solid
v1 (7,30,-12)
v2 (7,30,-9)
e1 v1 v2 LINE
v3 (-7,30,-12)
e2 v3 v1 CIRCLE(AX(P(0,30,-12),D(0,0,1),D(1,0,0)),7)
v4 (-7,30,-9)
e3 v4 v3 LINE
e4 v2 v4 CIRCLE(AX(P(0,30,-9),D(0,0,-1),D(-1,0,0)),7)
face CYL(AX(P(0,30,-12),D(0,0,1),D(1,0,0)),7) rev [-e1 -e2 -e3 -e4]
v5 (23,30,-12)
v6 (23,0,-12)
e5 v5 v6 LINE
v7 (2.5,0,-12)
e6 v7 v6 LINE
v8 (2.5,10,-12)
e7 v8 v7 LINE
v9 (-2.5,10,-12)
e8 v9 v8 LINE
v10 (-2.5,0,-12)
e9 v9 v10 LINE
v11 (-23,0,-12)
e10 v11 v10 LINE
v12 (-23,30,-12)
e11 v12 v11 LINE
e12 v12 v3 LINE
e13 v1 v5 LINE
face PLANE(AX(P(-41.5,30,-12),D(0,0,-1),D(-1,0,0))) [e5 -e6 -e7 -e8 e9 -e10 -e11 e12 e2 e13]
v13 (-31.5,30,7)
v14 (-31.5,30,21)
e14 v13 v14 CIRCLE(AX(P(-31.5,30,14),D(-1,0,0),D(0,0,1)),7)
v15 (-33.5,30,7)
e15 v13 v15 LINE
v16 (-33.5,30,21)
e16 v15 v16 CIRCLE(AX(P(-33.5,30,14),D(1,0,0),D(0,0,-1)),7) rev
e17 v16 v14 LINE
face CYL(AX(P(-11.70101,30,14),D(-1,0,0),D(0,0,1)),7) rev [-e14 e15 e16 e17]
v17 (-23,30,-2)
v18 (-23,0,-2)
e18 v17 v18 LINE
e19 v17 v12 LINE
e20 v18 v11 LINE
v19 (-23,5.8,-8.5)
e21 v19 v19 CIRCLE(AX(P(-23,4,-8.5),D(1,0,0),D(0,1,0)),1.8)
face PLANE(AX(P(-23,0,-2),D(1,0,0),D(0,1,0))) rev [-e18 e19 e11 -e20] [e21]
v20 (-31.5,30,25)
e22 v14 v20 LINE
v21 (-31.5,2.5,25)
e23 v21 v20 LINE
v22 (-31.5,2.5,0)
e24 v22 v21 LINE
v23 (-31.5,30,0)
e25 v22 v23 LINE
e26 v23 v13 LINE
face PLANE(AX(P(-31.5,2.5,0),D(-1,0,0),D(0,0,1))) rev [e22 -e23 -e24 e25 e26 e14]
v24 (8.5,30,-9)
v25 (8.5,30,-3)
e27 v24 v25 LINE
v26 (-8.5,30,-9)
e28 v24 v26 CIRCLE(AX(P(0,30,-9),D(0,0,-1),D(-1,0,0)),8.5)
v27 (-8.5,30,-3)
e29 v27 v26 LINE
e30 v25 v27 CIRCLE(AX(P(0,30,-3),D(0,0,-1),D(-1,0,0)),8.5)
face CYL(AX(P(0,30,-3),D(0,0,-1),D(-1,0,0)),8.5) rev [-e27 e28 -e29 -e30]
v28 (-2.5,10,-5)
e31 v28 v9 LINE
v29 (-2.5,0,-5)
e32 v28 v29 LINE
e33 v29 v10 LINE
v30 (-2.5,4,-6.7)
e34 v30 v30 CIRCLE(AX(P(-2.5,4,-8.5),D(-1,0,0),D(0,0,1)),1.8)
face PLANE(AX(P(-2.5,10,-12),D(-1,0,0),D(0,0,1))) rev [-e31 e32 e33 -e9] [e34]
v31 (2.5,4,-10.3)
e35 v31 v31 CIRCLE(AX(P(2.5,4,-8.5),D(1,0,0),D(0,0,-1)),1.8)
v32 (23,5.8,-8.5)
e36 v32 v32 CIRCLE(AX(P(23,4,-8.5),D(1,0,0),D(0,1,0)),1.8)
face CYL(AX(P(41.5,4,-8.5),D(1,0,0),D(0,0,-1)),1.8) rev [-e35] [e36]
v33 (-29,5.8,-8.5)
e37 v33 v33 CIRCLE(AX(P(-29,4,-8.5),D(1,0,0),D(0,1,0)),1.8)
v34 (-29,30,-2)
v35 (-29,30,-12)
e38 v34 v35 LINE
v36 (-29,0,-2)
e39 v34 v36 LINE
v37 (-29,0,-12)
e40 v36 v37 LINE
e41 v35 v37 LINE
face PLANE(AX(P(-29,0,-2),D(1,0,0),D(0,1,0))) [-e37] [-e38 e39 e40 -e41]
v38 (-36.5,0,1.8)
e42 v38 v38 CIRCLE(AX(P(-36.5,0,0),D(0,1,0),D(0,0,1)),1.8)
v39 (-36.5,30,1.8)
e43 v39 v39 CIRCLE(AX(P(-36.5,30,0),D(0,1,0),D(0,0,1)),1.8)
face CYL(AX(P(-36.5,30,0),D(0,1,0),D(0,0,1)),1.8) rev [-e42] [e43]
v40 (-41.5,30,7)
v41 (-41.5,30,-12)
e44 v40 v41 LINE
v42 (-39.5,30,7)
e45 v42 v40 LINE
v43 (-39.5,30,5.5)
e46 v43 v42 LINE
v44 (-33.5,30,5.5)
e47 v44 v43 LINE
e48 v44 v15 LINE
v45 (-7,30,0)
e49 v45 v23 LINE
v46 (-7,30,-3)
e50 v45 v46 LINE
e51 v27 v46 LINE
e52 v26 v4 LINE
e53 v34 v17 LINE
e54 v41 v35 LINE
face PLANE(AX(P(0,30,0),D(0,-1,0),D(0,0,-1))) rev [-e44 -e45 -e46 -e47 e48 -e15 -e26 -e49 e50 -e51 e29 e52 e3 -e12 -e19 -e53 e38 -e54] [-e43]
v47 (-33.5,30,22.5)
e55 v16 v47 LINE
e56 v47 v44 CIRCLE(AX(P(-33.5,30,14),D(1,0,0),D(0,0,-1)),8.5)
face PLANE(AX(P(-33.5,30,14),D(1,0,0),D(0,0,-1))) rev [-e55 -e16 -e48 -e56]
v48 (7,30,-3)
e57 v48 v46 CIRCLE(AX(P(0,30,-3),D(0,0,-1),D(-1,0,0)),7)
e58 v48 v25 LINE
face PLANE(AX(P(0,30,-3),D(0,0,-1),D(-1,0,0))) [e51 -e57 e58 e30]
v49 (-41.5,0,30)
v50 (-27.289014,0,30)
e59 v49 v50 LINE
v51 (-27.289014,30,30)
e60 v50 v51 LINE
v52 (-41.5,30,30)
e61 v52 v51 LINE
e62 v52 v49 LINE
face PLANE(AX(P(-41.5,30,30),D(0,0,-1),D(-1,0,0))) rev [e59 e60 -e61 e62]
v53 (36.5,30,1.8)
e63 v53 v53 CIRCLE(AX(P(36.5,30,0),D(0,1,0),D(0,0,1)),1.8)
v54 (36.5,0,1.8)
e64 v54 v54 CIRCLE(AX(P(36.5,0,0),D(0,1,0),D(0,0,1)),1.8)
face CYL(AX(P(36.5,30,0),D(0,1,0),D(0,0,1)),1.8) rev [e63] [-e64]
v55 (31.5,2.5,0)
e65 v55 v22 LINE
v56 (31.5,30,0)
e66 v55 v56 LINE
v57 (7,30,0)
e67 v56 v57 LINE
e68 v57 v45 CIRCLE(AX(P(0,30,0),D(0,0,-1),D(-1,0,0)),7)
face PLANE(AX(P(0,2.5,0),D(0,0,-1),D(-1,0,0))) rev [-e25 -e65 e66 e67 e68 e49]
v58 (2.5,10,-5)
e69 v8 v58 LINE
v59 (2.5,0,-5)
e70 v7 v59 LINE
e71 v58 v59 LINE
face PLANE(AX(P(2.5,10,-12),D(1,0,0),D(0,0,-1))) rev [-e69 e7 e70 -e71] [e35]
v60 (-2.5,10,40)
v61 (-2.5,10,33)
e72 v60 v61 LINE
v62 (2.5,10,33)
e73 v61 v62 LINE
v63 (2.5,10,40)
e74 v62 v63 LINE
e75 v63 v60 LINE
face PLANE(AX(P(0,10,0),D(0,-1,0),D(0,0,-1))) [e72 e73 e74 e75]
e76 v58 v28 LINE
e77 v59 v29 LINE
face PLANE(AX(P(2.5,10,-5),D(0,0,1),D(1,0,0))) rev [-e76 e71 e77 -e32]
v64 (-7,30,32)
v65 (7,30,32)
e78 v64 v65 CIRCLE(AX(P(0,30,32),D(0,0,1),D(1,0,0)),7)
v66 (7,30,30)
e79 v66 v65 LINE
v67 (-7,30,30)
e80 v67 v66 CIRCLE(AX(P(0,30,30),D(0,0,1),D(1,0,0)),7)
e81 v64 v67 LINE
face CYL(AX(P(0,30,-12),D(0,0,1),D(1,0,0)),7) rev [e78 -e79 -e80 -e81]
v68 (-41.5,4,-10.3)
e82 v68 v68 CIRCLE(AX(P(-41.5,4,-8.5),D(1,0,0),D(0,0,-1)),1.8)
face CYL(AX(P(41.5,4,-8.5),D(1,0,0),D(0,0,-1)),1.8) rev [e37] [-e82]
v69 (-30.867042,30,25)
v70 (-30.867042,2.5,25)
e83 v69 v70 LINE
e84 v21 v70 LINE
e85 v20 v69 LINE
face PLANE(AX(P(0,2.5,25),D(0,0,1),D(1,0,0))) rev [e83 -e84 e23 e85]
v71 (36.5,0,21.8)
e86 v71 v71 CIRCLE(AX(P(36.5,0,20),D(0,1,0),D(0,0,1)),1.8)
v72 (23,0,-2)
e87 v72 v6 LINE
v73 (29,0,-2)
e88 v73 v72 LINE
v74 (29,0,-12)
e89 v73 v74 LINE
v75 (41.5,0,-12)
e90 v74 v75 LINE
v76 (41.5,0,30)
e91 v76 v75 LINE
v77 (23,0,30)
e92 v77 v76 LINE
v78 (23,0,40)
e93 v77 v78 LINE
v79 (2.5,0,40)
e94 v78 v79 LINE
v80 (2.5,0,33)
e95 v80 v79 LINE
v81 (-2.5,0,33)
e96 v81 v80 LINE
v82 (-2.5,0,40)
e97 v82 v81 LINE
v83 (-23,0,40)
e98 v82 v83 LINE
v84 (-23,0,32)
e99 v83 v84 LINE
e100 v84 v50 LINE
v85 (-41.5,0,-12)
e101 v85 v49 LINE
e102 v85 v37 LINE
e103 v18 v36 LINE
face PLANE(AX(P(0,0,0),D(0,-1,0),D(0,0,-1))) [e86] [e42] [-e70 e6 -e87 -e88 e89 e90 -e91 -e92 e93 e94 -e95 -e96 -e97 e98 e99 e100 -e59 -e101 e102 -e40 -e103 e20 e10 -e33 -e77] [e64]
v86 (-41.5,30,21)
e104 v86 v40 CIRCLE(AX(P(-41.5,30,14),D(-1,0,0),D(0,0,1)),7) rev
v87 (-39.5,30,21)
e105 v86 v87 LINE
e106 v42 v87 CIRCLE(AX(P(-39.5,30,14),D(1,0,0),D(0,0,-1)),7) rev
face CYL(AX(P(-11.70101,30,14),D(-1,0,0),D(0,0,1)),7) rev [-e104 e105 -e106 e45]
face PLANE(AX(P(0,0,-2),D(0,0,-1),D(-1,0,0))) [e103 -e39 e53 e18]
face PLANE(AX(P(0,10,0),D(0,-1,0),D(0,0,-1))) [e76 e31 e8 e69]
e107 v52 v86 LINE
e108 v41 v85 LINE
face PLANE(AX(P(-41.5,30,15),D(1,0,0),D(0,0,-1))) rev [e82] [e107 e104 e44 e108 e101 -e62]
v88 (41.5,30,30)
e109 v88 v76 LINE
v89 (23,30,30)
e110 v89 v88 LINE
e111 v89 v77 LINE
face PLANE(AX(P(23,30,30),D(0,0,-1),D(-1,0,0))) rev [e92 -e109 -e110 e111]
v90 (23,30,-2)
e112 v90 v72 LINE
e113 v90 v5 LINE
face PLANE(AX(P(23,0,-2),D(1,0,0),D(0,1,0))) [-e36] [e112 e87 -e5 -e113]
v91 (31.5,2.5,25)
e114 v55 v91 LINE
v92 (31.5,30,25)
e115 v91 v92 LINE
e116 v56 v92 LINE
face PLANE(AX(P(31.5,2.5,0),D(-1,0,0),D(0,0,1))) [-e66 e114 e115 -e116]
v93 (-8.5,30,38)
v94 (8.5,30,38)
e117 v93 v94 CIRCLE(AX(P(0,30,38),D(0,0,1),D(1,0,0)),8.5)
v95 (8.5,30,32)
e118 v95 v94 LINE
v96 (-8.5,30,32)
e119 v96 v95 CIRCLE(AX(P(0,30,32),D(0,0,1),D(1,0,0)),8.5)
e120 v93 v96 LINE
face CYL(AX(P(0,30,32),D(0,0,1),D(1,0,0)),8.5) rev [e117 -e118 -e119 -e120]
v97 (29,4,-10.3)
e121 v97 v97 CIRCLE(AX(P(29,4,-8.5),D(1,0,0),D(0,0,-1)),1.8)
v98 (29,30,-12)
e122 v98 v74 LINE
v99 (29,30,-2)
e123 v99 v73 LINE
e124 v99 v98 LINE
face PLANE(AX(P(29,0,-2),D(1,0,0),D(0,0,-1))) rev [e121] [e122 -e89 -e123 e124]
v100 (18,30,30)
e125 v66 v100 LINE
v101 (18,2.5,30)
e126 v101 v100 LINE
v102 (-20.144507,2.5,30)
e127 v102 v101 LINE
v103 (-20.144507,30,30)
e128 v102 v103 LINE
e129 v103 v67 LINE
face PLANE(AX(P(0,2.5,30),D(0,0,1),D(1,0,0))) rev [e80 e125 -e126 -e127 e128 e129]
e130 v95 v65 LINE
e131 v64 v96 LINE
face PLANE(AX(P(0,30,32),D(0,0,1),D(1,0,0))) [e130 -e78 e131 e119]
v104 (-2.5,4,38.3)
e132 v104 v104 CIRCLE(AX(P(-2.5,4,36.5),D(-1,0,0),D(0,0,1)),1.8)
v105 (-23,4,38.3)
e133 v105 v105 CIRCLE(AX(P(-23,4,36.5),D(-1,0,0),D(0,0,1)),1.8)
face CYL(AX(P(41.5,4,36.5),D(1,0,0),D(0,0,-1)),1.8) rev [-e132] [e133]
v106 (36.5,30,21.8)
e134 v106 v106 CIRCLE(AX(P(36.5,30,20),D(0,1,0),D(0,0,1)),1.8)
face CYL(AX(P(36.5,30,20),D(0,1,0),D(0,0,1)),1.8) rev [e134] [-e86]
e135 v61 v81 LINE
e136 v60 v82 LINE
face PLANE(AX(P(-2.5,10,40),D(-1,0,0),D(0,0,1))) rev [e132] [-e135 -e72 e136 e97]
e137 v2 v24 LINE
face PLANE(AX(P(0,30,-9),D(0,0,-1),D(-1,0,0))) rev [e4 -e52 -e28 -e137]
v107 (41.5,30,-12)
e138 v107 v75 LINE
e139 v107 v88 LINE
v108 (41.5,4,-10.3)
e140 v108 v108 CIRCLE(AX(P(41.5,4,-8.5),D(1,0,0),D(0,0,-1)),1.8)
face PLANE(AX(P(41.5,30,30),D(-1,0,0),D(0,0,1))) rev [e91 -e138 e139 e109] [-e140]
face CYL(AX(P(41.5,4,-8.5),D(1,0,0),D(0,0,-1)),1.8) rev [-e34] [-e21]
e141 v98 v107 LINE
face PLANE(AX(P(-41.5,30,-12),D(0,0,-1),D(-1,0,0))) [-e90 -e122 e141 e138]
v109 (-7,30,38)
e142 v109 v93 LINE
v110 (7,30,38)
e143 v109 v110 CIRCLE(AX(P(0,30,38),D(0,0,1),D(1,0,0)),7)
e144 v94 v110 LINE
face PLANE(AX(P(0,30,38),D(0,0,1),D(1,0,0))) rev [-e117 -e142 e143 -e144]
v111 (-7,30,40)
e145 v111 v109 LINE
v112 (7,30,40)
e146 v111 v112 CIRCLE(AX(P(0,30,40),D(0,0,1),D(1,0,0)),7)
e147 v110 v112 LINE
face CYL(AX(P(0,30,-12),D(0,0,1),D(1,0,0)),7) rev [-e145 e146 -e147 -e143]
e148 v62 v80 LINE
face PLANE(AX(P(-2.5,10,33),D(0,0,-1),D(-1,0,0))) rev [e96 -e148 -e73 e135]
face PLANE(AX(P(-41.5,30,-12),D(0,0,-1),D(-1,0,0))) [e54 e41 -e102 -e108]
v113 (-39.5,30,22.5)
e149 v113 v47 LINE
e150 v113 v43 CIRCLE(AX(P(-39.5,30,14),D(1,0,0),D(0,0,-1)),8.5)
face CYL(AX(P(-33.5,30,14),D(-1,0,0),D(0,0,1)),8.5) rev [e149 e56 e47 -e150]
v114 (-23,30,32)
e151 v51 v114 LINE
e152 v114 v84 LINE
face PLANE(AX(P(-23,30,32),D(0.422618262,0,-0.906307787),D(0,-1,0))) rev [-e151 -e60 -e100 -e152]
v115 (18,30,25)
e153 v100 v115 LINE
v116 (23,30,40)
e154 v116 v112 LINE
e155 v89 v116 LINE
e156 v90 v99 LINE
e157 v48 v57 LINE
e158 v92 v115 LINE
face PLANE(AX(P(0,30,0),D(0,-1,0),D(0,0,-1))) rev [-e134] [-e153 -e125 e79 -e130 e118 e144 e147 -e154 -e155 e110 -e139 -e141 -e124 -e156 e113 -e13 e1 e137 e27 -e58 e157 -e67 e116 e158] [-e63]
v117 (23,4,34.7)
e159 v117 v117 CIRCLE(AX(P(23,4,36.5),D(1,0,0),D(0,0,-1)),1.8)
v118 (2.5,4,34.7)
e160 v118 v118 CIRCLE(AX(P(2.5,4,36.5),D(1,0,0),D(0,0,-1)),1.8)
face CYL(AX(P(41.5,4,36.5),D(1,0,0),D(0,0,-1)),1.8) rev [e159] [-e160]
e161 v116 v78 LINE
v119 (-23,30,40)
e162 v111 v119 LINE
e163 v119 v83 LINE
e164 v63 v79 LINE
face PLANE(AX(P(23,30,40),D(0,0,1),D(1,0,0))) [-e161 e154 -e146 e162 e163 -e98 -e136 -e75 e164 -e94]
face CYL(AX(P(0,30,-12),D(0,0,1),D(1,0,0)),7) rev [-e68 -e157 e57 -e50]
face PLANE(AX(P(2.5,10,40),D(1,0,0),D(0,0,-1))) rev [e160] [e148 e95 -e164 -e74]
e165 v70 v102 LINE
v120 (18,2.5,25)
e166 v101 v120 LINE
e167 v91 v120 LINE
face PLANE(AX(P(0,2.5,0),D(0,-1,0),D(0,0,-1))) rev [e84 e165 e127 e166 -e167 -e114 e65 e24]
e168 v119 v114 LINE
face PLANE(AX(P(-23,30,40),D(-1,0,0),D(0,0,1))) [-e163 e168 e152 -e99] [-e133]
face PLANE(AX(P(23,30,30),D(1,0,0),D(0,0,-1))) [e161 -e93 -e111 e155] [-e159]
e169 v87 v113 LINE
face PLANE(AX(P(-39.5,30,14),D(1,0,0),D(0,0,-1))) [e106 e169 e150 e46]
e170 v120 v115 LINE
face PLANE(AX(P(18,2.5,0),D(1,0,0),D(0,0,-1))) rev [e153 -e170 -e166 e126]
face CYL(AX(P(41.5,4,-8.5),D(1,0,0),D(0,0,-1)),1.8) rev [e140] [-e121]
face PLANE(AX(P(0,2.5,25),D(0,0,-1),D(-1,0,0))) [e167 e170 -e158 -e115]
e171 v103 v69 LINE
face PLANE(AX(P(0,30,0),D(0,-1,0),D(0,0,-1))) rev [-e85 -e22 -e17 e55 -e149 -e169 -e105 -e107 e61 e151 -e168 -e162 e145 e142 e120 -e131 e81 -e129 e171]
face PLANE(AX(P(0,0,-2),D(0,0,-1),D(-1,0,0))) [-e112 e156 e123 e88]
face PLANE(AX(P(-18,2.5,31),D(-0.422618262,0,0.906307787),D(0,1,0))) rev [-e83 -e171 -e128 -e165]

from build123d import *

# Parameters (mm, degrees)
BOSS_EXTRUDE1_DEPTH  = 30
CUT_EXTRUDE2_START   = 2.5
CUT_EXTRUDE2_DEPTH   = 27.5
CUT_EXTRUDE3_START   = -2
SKETCH3_R            = 8.5
CUT_EXTRUDE3_DEPTH   = 6
CUT_EXTRUDE4_START   = -9
SKETCH4_R            = 8.5
CUT_EXTRUDE4_DEPTH   = 6
CUT_EXTRUDE6_DEPTH   = 73.981161953
SKETCH16_W           = 6
SKETCH16_H           = 30
CUT_EXTRUDE7_DEPTH   = 10
CUT_EXTRUDE8_START   = 2
SKETCH17_R           = 8.5
CUT_EXTRUDE8_DEPTH   = 6
CUT_EXTRUDE9_REACH   = 98.897
CHAMFER1_SIZE        = 2
CHAMFER1_SIZE2       = 4.289013841
CHAMFER2_SIZE        = 12.867041523
CHAMFER2_SIZE_2      = 6
SKETCH19_W           = 5
SKETCH19_H           = 7
CUT_EXTRUDE11_DEPTH  = 10
M3_CLEARANCE_HOLE1_D = 3.6
M3_CLEARANCE_HOLE2_D = 3.6


with BuildPart() as part:
    # Sketch1 → Boss-Extrude1 (new body)
    with BuildSketch(Plane(origin=(0, 0, 0), x_dir=(1, 0, 0), z_dir=(0, 1, 0))):
        Polygon((-41.5, 12), (41.5, 12), (41.5, -15), (41.5, -30), (23, -30), (23, -40), (-23, -40), (-23, -30), (-41.5, -30), (-41.5, -15), align=None)
    extrude(amount=BOSS_EXTRUDE1_DEPTH)

    # Sketch1<4> → Cut-Extrude2 (cut)
    with BuildSketch(Plane(origin=(0, 0, 0), x_dir=(1, 0, 0), z_dir=(0, 1, 0)).offset(CUT_EXTRUDE2_START)):
        Polygon((31.5, 0), (-31.5, 0), (-31.5, -10), (-31.5, -25), (-18, -25), (-18, -30), (18, -30), (18, -25), (31.5, -25), (31.5, -10), align=None)
    extrude(amount=CUT_EXTRUDE2_DEPTH, mode=Mode.SUBTRACT)

    # Sketch3 → Cut-Extrude3 (cut)
    with BuildSketch(Plane.XY.offset(40).offset(CUT_EXTRUDE3_START)):
        with Locations((0, 30)):
            Circle(SKETCH3_R)
    extrude(amount=-CUT_EXTRUDE3_DEPTH, mode=Mode.SUBTRACT)

    # Sketch4 → Cut-Extrude4 (cut)
    with BuildSketch(Plane(origin=(0, 0, -12), x_dir=(-1, 0, 0), z_dir=(0, 0, -1)).offset(CUT_EXTRUDE4_START)):
        with Locations((0, 30)):
            Circle(SKETCH4_R)
    extrude(amount=CUT_EXTRUDE4_DEPTH, mode=Mode.SUBTRACT)

    # Sketch3<4> → Cut-Extrude6 (cut, through all)
    with BuildSketch(Plane.XY.offset(40)):
        with BuildLine():
            Line((-7, 30), (7, 30))
            ThreePointArc((7, 30), (0, 37), (-7, 30))
        make_face()
        with BuildLine():
            ThreePointArc((-7, 30), (0, 23), (7, 30))
            Line((7, 30), (-7, 30))
        make_face()
        with BuildLine():
            Line((-7, 30), (7, 30))
            ThreePointArc((7, 30), (0, 37), (-7, 30))
        make_face()
        with BuildLine():
            ThreePointArc((-7, 30), (0, 23), (7, 30))
            Line((7, 30), (-7, 30))
        make_face()
    extrude(amount=-CUT_EXTRUDE6_DEPTH, mode=Mode.SUBTRACT)

    # Sketch16 → Cut-Extrude7 (cut)
    with BuildSketch(Plane(origin=(0, 0, -12), x_dir=(-1, 0, 0), z_dir=(0, 0, -1))):
        with Locations((26, 15)):
            Rectangle(SKETCH16_W, SKETCH16_H)
        with Locations((-26, 15)):
            Rectangle(SKETCH16_W, SKETCH16_H)
    extrude(amount=-CUT_EXTRUDE7_DEPTH, mode=Mode.SUBTRACT)

    # Sketch17 → Cut-Extrude8 (cut)
    with BuildSketch(Plane(origin=(-41.5, 0, 0), x_dir=(0, 0, -1), z_dir=(1, 0, 0)).offset(CUT_EXTRUDE8_START)):
        with Locations((-14, 30)):
            Circle(SKETCH17_R)
    extrude(amount=CUT_EXTRUDE8_DEPTH, mode=Mode.SUBTRACT)

    # Cut-Extrude9: up to this face of the body (flat: up to its plane)
    cut_extrude9_end = Plane(part.part.faces().sort_by_distance((-31.5, 16.25, 12.5))[0])
    # Sketch17<3> → Cut-Extrude9 (cut, up to the picked face)
    with BuildSketch(Plane(origin=(-41.5, 0, 0), x_dir=(0, 0, -1), z_dir=(1, 0, 0)), mode=Mode.PRIVATE) as cut_extrude9_sk1:
        with BuildLine():
            Line((-21, 30), (-7, 30))
            ThreePointArc((-7, 30), (-14, 37), (-21, 30))
        make_face()
    cut_extrude9_tool1 = split(extrude(cut_extrude9_sk1.sketch, amount=CUT_EXTRUDE9_REACH, mode=Mode.PRIVATE), bisect_by=cut_extrude9_end, keep=Keep.BOTH, mode=Mode.PRIVATE)
    # Sketch17<3> → Cut-Extrude9 (cut, up to the picked face)
    with BuildSketch(Plane(origin=(-41.5, 0, 0), x_dir=(0, 0, -1), z_dir=(1, 0, 0)), mode=Mode.PRIVATE) as cut_extrude9_sk2:
        with BuildLine():
            ThreePointArc((-21, 30), (-14, 23), (-7, 30))
            Line((-7, 30), (-21, 30))
        make_face()
    cut_extrude9_tool2 = split(extrude(cut_extrude9_sk2.sketch, amount=CUT_EXTRUDE9_REACH, mode=Mode.PRIVATE), bisect_by=cut_extrude9_end, keep=Keep.BOTH, mode=Mode.PRIVATE)
    # Sketch17<3> → Cut-Extrude9 (cut, up to the picked face)
    with BuildSketch(Plane(origin=(-41.5, 0, 0), x_dir=(0, 0, -1), z_dir=(1, 0, 0)), mode=Mode.PRIVATE) as cut_extrude9_sk3:
        with BuildLine():
            Line((-21, 30), (-7, 30))
            ThreePointArc((-7, 30), (-14, 37), (-21, 30))
        make_face()
    cut_extrude9_tool3 = split(extrude(cut_extrude9_sk3.sketch, amount=CUT_EXTRUDE9_REACH, mode=Mode.PRIVATE), bisect_by=cut_extrude9_end, keep=Keep.BOTH, mode=Mode.PRIVATE)
    # Sketch17<3> → Cut-Extrude9 (cut, up to the picked face)
    with BuildSketch(Plane(origin=(-41.5, 0, 0), x_dir=(0, 0, -1), z_dir=(1, 0, 0)), mode=Mode.PRIVATE) as cut_extrude9_sk4:
        with BuildLine():
            ThreePointArc((-21, 30), (-14, 23), (-7, 30))
            Line((-7, 30), (-21, 30))
        make_face()
    cut_extrude9_tool4 = split(extrude(cut_extrude9_sk4.sketch, amount=CUT_EXTRUDE9_REACH, mode=Mode.PRIVATE), bisect_by=cut_extrude9_end, keep=Keep.BOTH, mode=Mode.PRIVATE)
    add(cut_extrude9_tool1.solids().sort_by(Axis((-41.5, 32.970892, 14), (1, 0, 0)))[0], mode=Mode.SUBTRACT)
    add(cut_extrude9_tool2.solids().sort_by(Axis((-41.5, 27.029108, 14), (1, 0, 0)))[0], mode=Mode.SUBTRACT)
    add(cut_extrude9_tool3.solids().sort_by(Axis((-41.5, 32.970892, 14), (1, 0, 0)))[0], mode=Mode.SUBTRACT)
    add(cut_extrude9_tool4.solids().sort_by(Axis((-41.5, 27.029108, 14), (1, 0, 0)))[0], mode=Mode.SUBTRACT)

    # Chamfer1
    chamfer1_edges = [part.edges().sort_by_distance(p)[0] for p in [
        (-23, 15, 30),
    ]]
    chamfer1_side = [part.faces().sort_by_distance(p)[0] for p in [
        (-23, 15, 35),
    ]]
    chamfer(chamfer1_edges, length=CHAMFER1_SIZE, length2=CHAMFER1_SIZE2, reference=chamfer1_side[0])

    # Chamfer2
    # the kernel refuses this chamfer: 12.867041523, 6 mm, written as the material it takes off along each edge
    with BuildSketch(Plane(origin=(-18, 2.5, 25), x_dir=(-0.9998669641130704, 0, -0.016311164131110355), z_dir=(0, 1, 0))) as chamfer2_piece_1_section:
        Polygon((CHAMFER2_SIZE * 0.999866964118, CHAMFER2_SIZE * 0.0163111641312), (-CHAMFER2_SIZE_2 * 0.0163111641311, CHAMFER2_SIZE_2 * 0.999866964113), (0, 0), align=None)
    chamfer2_piece_1 = extrude(amount=60.838188976, mode=Mode.PRIVATE)
    chamfer2_piece_1 = split(chamfer2_piece_1, bisect_by=Plane(origin=(-22.391133218, 16.25, 30), z_dir=(0, 0, -1)), keep=Keep.TOP, mode=Mode.PRIVATE)
    add(chamfer2_piece_1, mode=Mode.SUBTRACT)

    # Sketch19 → Cut-Extrude11 (cut)
    with BuildSketch(Plane.XZ):
        with Locations((0, -8.5)):
            Rectangle(SKETCH19_W, SKETCH19_H)
        with Locations((0, 36.5)):
            Rectangle(SKETCH19_W, SKETCH19_H)
    extrude(amount=-CUT_EXTRUDE11_DEPTH, mode=Mode.SUBTRACT)

    # M3 Clearance Hole1 (through all)
    with Locations(Plane(origin=(41.5, 0, 0), x_dir=(0, 0, -1), z_dir=(1, 0, 0))):
        with Locations((8.5, 4), (-36.5, 4)):
            Hole(M3_CLEARANCE_HOLE1_D / 2)

    # M3 Clearance Hole2 (through all)
    with Locations(Plane(origin=(0, 30, 0), x_dir=(1, 0, 0), z_dir=(0, 1, 0))):
        with Locations((-36.5, 0), (36.5, 0), (36.5, -20)):
            Hole(M3_CLEARANCE_HOLE2_D / 2)


solid = part.part
